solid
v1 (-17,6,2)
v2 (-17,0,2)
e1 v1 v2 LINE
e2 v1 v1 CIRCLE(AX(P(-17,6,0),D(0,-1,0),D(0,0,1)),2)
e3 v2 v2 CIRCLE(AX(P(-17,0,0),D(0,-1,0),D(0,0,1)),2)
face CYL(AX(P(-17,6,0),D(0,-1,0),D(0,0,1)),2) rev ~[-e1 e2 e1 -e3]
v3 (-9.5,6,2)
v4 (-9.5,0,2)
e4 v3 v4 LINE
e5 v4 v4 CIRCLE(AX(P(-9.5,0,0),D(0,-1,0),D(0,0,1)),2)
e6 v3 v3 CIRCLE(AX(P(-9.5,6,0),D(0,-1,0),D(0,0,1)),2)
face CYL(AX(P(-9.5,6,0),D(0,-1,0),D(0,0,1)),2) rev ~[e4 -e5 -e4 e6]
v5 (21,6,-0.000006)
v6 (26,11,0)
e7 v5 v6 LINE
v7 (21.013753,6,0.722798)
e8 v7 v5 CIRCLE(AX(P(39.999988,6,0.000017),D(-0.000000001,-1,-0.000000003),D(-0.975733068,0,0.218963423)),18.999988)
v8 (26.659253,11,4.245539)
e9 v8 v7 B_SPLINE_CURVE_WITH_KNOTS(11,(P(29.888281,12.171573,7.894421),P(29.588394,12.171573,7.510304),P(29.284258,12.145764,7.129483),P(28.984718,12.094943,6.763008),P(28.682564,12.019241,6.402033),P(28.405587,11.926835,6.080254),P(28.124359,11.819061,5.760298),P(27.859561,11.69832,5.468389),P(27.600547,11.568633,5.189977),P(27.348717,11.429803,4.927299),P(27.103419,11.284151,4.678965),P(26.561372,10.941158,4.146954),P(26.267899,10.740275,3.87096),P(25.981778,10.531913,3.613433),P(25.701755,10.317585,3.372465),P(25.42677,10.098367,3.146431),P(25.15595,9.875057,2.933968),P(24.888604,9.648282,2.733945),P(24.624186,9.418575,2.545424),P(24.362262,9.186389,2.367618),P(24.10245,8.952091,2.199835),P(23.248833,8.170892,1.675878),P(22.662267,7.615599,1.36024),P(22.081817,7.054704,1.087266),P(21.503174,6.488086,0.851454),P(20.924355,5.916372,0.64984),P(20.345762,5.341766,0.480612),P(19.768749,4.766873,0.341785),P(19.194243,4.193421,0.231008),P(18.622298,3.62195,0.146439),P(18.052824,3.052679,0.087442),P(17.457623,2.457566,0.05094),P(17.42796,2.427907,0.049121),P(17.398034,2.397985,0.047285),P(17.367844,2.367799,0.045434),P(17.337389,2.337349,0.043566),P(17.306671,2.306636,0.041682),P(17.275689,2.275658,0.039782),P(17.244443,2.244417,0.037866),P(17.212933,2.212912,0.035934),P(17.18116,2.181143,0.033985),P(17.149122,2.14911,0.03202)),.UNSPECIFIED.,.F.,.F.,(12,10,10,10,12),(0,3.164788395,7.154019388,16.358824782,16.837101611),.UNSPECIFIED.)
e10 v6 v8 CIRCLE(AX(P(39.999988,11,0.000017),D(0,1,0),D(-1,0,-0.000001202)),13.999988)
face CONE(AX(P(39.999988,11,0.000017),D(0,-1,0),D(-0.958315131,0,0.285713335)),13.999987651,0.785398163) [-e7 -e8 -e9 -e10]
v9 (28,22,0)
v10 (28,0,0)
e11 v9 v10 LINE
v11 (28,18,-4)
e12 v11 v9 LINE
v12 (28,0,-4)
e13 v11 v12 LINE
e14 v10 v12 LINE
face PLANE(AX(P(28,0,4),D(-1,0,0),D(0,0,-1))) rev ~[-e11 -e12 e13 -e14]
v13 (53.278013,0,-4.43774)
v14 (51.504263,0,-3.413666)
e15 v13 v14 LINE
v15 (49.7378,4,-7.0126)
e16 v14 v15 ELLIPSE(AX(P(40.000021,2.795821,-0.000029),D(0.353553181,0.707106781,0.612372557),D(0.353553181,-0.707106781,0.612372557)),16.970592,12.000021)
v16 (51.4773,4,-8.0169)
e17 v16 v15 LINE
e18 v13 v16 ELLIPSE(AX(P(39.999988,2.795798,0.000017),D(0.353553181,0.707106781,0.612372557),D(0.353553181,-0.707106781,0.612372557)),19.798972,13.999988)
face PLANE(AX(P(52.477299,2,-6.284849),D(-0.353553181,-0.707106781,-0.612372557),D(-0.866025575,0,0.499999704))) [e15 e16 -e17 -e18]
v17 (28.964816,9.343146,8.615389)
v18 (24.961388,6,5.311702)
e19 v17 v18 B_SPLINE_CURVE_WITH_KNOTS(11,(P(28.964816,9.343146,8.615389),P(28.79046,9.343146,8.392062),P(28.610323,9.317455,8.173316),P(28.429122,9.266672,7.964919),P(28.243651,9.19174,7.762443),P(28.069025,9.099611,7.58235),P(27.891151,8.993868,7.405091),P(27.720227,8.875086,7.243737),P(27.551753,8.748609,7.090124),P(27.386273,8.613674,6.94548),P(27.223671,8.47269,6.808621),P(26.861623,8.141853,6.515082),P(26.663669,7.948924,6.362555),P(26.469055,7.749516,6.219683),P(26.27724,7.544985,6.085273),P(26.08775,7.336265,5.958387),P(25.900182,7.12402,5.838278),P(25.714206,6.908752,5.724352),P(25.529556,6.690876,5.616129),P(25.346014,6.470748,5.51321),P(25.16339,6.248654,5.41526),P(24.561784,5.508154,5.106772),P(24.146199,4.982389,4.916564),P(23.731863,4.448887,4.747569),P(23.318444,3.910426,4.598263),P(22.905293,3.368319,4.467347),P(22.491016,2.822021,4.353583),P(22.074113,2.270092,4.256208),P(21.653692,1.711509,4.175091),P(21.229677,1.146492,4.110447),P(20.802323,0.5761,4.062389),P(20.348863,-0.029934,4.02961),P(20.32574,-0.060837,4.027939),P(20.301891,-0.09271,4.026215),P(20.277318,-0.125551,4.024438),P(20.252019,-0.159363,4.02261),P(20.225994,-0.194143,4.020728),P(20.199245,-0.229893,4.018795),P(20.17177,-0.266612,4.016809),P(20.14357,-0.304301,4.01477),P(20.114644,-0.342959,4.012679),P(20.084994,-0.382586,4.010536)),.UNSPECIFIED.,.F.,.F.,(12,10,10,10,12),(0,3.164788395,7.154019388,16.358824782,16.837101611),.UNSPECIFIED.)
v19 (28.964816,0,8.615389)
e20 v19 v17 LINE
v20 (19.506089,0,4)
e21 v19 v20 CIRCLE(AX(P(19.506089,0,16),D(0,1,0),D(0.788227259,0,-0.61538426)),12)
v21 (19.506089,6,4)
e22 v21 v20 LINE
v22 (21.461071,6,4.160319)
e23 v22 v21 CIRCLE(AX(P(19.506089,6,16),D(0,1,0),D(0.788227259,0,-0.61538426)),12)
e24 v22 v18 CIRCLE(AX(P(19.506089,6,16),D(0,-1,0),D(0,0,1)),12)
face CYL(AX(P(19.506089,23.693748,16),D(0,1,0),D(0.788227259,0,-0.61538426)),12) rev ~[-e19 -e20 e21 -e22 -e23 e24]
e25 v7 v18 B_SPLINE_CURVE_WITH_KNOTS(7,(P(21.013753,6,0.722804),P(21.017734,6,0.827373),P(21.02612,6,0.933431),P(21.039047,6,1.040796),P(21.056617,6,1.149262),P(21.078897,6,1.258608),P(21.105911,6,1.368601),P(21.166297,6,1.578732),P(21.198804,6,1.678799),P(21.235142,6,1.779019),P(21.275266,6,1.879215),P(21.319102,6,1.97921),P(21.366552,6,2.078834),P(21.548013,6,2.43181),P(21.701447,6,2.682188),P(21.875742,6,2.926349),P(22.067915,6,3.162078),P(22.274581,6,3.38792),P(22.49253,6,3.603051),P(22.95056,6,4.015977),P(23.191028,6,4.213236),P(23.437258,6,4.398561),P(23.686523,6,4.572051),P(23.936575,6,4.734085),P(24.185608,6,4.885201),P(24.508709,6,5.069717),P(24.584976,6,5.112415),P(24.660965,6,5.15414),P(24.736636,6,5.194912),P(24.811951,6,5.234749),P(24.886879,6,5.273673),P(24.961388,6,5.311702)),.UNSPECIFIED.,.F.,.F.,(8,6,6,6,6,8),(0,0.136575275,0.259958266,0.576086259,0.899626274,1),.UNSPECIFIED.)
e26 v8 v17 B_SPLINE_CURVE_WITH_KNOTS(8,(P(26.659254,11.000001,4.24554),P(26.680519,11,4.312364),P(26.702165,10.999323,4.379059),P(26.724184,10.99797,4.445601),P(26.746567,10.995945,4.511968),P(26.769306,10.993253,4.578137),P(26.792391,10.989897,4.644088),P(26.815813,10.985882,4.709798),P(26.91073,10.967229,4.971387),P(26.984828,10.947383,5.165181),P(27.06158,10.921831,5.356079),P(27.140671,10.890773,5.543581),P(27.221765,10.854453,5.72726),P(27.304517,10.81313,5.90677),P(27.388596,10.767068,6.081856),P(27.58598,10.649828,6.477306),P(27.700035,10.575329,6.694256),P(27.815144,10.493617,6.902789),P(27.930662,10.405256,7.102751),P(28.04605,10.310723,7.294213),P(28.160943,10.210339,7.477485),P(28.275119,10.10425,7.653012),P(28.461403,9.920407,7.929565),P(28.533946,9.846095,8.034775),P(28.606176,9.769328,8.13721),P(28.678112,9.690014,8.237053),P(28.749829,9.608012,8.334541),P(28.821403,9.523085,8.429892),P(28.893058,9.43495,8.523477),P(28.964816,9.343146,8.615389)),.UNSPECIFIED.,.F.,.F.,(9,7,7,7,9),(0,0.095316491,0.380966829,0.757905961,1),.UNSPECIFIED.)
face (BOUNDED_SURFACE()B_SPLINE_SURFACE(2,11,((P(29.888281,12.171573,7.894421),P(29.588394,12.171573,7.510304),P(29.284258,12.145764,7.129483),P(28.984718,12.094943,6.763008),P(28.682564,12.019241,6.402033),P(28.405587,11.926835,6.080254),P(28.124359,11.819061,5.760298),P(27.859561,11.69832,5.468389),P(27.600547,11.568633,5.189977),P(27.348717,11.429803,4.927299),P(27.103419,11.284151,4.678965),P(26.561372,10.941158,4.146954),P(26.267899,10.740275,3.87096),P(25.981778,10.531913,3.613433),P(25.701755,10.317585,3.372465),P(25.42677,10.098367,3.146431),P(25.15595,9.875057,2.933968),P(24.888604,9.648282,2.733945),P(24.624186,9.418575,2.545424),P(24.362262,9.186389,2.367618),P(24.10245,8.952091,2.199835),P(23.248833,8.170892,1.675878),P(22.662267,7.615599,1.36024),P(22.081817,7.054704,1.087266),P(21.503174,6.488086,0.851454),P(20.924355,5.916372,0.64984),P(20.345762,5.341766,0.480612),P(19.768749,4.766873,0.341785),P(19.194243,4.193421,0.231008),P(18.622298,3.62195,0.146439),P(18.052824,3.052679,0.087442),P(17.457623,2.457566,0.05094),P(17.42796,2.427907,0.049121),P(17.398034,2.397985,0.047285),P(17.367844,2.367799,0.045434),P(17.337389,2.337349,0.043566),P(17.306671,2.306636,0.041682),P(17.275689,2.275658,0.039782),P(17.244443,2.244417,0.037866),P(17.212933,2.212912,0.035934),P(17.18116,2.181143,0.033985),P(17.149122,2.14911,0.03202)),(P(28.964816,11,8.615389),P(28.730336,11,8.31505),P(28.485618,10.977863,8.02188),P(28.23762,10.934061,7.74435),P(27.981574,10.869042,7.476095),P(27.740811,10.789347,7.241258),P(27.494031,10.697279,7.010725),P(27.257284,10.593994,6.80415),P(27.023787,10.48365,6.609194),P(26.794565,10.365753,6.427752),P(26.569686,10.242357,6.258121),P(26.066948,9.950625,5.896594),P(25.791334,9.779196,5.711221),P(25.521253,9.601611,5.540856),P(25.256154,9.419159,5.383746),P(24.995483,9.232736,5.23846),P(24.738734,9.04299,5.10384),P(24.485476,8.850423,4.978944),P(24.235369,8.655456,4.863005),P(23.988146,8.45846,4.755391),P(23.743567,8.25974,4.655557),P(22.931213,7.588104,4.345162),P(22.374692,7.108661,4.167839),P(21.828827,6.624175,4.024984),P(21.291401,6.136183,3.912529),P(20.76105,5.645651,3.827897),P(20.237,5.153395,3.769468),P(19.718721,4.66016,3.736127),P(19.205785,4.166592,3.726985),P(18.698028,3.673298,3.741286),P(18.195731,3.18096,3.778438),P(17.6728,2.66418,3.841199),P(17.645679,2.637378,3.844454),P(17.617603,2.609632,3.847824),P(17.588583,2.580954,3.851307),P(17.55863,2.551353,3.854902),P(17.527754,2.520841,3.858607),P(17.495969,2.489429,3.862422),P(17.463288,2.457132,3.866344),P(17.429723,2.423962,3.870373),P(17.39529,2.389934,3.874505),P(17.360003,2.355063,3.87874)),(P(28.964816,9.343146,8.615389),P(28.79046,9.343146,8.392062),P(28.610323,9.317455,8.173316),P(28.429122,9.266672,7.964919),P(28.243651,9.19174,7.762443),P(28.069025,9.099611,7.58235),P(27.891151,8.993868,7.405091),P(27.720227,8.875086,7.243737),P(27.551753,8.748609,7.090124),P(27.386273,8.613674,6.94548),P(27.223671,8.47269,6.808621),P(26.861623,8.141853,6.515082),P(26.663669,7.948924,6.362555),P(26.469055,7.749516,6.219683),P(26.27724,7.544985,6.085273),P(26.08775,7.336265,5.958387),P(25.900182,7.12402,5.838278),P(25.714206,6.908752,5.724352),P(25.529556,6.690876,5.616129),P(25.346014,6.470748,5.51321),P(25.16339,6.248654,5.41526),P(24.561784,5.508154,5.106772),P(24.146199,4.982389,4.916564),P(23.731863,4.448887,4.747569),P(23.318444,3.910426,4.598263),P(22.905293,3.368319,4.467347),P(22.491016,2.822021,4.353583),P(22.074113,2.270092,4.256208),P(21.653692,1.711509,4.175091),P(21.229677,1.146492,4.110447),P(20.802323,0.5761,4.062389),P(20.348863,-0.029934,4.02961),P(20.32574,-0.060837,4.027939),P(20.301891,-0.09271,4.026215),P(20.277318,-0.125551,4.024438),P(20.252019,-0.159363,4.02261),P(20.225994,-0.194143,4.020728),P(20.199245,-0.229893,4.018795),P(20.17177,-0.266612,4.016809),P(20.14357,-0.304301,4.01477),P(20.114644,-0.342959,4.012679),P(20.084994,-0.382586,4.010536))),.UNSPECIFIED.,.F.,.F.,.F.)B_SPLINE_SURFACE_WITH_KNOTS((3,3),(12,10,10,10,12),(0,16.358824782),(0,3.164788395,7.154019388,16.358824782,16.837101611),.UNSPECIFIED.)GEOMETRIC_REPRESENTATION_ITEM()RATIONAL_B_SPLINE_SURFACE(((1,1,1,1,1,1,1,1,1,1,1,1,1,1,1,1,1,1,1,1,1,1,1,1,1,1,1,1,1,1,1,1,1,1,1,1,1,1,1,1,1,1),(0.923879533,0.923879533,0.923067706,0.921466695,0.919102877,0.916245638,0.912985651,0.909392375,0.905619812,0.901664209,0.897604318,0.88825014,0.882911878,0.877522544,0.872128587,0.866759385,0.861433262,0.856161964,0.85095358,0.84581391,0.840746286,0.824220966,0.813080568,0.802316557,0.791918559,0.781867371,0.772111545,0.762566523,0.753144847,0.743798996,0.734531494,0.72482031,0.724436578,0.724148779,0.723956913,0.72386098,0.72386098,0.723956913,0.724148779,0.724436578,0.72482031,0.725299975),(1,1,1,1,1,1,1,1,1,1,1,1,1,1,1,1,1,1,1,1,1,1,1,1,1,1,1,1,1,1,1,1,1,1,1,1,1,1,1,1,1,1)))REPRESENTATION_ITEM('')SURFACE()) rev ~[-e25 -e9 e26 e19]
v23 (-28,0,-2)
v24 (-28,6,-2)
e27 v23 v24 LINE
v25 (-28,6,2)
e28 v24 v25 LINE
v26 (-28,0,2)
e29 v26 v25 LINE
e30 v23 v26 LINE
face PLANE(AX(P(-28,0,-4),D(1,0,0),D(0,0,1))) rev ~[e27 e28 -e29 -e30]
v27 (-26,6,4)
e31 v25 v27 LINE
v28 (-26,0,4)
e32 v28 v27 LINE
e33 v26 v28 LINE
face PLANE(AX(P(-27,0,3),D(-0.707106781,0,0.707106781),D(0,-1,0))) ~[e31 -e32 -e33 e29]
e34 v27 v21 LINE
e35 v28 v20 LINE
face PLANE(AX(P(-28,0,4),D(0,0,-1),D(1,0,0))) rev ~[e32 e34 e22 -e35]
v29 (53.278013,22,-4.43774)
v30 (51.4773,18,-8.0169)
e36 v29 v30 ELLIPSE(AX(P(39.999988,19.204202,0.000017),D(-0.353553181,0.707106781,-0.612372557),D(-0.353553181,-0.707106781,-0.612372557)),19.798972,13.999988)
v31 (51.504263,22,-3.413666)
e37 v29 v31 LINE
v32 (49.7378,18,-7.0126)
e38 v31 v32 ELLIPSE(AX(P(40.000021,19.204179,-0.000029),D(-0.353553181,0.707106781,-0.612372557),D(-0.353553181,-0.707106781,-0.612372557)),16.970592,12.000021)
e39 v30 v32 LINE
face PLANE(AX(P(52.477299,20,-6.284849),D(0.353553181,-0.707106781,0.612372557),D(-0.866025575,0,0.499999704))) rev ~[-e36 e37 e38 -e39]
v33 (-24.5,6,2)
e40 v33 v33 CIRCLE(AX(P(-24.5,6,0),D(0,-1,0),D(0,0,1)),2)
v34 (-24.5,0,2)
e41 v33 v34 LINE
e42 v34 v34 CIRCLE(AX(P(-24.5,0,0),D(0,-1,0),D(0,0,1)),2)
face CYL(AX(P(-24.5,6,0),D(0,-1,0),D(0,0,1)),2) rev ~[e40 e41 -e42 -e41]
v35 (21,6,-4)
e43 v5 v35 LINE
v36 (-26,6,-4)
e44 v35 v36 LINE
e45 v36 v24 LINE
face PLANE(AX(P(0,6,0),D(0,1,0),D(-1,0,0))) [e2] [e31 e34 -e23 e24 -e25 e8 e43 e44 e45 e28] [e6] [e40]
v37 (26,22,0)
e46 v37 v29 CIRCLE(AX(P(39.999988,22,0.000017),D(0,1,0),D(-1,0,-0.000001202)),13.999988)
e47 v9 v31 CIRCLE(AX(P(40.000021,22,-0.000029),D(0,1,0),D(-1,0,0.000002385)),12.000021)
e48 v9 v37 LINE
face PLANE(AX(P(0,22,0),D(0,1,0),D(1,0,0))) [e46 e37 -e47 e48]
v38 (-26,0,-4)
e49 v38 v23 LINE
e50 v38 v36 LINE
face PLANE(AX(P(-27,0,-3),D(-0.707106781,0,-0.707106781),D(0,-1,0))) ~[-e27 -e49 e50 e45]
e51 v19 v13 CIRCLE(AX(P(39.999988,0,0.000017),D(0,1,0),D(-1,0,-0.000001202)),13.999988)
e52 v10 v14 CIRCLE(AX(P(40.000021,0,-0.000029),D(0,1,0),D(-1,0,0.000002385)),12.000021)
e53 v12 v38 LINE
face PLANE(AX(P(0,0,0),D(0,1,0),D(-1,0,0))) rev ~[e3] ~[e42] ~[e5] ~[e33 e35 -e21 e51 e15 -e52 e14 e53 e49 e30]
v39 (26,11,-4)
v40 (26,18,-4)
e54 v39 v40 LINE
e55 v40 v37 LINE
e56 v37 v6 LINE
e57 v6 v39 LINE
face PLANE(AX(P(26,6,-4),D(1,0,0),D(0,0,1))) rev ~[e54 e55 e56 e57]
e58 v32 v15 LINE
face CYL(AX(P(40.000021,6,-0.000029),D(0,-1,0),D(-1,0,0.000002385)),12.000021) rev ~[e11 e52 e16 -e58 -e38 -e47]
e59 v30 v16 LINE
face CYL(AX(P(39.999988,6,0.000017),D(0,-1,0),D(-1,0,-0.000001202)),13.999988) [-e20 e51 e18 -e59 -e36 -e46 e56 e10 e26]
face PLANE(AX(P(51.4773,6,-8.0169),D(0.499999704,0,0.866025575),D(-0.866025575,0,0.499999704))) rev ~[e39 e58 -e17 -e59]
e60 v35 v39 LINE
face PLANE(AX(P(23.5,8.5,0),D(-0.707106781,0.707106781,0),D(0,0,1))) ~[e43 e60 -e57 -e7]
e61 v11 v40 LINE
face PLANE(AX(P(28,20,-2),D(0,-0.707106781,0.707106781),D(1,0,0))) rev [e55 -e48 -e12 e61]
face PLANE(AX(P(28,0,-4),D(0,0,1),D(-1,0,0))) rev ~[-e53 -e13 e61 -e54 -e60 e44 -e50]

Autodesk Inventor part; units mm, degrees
ref_plane "YZ Plane" through (0, 0, 0) normal (1, 0, 0) x (0, 1, 0)
ref_plane "XZ Plane" through (0, 0, 0) normal (0, 1, 0) x (-1, 0, 0)
ref_plane "XY Plane" through (0, 0, 0) normal (0, 0, 1) x (1, 0, 0)
sketch "Sketch1" plane through (0, 0, 0) normal (0, 1, 0) x (-1, 0, 0)
  line L0 (28, 4) -> (-28, 4)
  line L1 (-28, 4) -> (-28, -4)
  line L2 (-28, -4) -> (28, -4)
  line L3 (28, -4) -> (28, 4)
  line L4 (28, 4) -> (-28, -4) construction
  line L5 (-28, 4) -> (28, -4) construction
  point P0 (0, 0)
  dimension "d0" = 8
  dimension "d1" = 56
extrude "Extrusion1" add sketch "Sketch1" along normal blind 6
sketch "Sketch2" plane through (0, 6, 0) normal (0, 1, 0) x (1, 0, 0)
  line L0 (28, -4) -> (28, 4) projected
  line L1 (28, 4) -> (-28, 4) projected
  line L2 (-28, 4) -> (-28, -4) projected
  line L3 (-28, -4) -> (28, -4) projected
  point P0 (0, 0)
  point P1 (-17, 0)
  point P2 (-24.5, 0)
  point P3 (-9.5, 0)
  dimension "d4" = 7.5
  dimension "d5" = 11
  dimension "d14" = 7.5
hole "Hole1" at (-17, 6, 0) at (-24.5, 6, 0) at (-9.5, 6, 0) direction (0, -1, 0) diameter 4 end through all
sketch "Sketch3" plane through (0, 6, 0) normal (0, 1, 0) x (1, 0, 0)
  line L0 (28, -4) -> (28, 4) projected
  arc A0 (28, 0) -> (49.7378, 7.0126) centre (40, 0) ccw
  arc A1 (26, 0) -> (51.4773, 8.0169) centre (40, 0) ccw
  line L1 (51.4773, 8.0169) -> (49.7378, 7.0126)
  line L2 (28, 0) -> (28, 4)
  line L3 (28, 4) -> (-28, 4) projected
  line L4 (26, 4) -> (26, 0)
  point P0 (0, 0)
  dimension "d15" = 2
  dimension "d16" = 0
  dimension "d17" = 60
  dimension "d22" = 12
extrude "Extrusion2" add sketch "Sketch3" along normal blind 16 and the other way blind 6
chamfer "Chamfer1" distance 5 angle 45 2 edges at (26, 6, -2) (26.1467, 6, 2.0212)
chamfer "Chamfer2" distance 2 angle 45 2 edges at (-28, 3, 4) (-28, 3, -4)
chamfer "Chamfer3" distance 4 angle 45 3 edges at (27, 22, -4) (50.6076, 22, -7.5147) (50.6076, 0, -7.5147)
fillet "Fillet1" radius 12 1 edges at (26.5836, 3, 4)
fillet "Fillet2" radius 4 1 edges at (24.865, 8.9761, 5.2631)
properties part number "squirrely_leg_front"
